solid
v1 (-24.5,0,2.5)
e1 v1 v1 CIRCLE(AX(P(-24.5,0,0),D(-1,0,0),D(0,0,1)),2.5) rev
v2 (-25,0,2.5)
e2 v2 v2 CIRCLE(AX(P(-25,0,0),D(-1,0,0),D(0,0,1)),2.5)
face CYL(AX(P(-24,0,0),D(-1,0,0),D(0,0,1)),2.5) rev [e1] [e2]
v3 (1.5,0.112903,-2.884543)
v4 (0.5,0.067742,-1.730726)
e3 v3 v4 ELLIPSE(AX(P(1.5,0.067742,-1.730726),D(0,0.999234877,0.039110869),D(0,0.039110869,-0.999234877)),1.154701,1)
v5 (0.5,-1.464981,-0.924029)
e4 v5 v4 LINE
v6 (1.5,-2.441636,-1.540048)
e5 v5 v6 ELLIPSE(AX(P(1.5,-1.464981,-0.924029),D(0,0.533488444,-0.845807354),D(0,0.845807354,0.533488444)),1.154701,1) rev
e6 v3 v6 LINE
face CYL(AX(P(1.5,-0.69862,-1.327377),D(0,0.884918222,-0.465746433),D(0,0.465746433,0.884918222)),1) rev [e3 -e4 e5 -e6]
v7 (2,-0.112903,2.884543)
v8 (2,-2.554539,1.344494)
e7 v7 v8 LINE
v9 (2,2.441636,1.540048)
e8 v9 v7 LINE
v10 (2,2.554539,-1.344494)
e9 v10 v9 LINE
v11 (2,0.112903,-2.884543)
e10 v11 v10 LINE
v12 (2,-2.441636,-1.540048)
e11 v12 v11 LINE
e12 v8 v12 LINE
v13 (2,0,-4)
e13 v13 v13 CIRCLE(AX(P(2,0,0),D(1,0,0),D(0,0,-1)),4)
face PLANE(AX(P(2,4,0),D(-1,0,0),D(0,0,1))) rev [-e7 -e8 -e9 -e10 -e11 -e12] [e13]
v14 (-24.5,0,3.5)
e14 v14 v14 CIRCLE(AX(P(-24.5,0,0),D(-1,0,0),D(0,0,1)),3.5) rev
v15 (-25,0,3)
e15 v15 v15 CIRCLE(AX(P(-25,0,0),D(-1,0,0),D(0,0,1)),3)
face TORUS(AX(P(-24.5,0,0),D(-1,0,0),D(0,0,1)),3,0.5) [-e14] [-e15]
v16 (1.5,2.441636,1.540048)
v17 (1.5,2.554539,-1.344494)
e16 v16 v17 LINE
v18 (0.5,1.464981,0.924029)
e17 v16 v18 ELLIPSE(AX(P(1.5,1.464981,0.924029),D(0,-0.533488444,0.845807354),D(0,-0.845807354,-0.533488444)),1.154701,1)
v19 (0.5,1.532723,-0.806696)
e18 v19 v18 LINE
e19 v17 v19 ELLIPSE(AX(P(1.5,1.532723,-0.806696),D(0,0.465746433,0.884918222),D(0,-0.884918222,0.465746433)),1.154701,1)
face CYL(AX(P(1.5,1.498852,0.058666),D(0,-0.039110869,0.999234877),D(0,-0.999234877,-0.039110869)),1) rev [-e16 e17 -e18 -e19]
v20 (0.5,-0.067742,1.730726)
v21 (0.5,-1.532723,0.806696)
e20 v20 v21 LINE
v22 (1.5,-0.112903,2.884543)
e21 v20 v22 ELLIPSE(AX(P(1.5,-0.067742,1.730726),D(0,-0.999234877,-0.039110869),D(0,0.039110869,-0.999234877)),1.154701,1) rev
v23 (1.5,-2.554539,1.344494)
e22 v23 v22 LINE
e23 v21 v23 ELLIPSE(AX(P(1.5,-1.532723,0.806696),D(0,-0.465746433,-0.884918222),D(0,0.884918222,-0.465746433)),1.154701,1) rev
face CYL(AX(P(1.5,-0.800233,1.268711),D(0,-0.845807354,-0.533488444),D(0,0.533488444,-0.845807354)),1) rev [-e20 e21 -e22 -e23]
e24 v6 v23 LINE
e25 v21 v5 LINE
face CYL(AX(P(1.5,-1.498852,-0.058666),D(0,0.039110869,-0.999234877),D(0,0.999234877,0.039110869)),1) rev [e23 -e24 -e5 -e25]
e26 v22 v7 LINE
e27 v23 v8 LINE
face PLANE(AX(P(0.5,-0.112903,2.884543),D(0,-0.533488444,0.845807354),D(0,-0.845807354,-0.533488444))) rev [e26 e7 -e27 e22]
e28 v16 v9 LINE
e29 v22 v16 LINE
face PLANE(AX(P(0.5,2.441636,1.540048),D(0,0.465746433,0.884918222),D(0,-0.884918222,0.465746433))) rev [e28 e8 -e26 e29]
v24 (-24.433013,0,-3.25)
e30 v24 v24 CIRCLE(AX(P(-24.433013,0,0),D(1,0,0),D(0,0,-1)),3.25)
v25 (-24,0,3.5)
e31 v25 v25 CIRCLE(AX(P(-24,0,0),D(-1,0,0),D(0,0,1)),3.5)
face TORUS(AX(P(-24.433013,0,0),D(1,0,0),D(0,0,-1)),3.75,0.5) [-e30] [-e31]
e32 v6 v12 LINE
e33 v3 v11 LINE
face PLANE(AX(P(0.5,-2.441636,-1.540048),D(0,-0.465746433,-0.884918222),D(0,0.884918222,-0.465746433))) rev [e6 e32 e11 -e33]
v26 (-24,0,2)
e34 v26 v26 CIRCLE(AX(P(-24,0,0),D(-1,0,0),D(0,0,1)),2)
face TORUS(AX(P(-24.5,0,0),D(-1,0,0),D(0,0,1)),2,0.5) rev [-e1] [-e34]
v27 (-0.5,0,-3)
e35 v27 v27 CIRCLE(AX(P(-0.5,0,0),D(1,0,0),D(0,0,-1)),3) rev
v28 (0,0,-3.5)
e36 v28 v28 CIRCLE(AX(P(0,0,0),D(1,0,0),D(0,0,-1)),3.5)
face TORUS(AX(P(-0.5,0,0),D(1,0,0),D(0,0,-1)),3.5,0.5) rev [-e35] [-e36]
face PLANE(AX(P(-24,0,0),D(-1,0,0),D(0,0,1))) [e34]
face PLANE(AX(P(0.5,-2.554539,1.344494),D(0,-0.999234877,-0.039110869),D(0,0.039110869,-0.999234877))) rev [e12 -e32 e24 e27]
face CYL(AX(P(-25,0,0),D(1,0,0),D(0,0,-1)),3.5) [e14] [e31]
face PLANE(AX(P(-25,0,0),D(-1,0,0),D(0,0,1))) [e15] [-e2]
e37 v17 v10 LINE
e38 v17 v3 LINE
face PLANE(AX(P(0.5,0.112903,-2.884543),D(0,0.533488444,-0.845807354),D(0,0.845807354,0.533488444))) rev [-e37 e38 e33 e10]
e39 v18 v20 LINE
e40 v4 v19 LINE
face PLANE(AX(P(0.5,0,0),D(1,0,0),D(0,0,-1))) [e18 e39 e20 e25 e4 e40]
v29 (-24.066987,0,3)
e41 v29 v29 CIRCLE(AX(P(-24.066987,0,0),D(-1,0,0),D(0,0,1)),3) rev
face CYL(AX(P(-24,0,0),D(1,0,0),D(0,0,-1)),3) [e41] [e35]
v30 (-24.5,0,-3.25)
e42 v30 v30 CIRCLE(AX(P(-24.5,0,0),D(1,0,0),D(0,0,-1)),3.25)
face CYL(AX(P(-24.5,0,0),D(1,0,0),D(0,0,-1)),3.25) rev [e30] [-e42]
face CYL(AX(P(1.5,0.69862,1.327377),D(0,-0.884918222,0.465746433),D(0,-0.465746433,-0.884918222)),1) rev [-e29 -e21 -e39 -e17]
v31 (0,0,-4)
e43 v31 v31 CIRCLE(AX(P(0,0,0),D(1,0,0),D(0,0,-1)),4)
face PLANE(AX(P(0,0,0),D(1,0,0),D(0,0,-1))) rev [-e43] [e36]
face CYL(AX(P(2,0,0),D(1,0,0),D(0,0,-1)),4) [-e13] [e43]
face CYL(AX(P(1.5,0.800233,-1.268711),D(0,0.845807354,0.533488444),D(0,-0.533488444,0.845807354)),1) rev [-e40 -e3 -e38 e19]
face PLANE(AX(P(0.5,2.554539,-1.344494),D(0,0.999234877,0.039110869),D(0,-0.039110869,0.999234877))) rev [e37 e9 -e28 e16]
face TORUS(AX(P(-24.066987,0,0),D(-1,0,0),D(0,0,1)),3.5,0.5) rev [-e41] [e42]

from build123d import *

# Parameters (mm, degrees)
ESBO_O4_R                = 3
RESSALTO_EXTRUS_O1_DEPTH = 24
CORTE_EXTRUS_O1_DEPTH    = 1.5
ESBO_O6_R                = 3.5
RESSALTO_EXTRUS_O2_DEPTH = 1
ESBO_O7_R                = 2.5
CORTE_EXTRUS_O2_DEPTH    = 1
ESBO_O8_R                = 3.25
ESBO_O8_R_2              = 3.0000000000000004
CORTE_EXTRUS_O3_DEPTH    = 0.5
FILETE2_R                = 0.5
FILETE3_R                = 1


with BuildPart() as part:
    # Esboço1 → Revolução3 (revolve)
    with BuildSketch(Plane.XY, mode=Mode.PRIVATE) as revolu_o3_sk:
        Polygon((0, 0), (4.3e-16, 4), (2.0000000000000004, 4), (2, 0), align=None)
    revolve(revolu_o3_sk.sketch.rotate(Axis((2, 0, 0), (-1, 0, 0)), 90), axis=Axis((2, 0, 0), (-1, 0, 0)))

    # Esboço4 → Ressalto-extrusão1 (add)
    with BuildSketch(Plane.ZY):
        with Locations(Location((0, 0, 0), (0, 0, 180))):
            Circle(ESBO_O4_R)
    extrude(amount=RESSALTO_EXTRUS_O1_DEPTH)

    # Esboço5 → Corte-extrusão1 (cut)
    with BuildSketch(Plane(origin=(2, 0, 0), x_dir=(0, 0, -1), z_dir=(1, 0, 0))):
        Polygon((1.3444941418500793, 2.554538869515231), (-1.5400484850299316, 2.441635516839142), (-2.88454262688001, -0.11290335267608817), (-1.3444941418500784, -2.5545388695152305), (1.540048485029931, -2.4416355168391424), (2.8845426268800107, 0.11290335267608934), align=None)
    extrude(amount=-CORTE_EXTRUS_O1_DEPTH, mode=Mode.SUBTRACT)

    # Esboço6 → Ressalto-extrusão2 (add)
    with BuildSketch(Plane.ZY.offset(24)):
        Circle(ESBO_O6_R)
    extrude(amount=RESSALTO_EXTRUS_O2_DEPTH)

    # Esboço7 → Corte-extrusão2 (cut)
    with BuildSketch(Plane.ZY.offset(25)):
        Circle(ESBO_O7_R)
    extrude(amount=-CORTE_EXTRUS_O2_DEPTH, mode=Mode.SUBTRACT)

    # Esboço8 → Corte-extrusão3 (cut)
    with BuildSketch(Plane(origin=(-24, 0, 0), x_dir=(0, 0, -1), z_dir=(1, 0, 0))):
        Circle(ESBO_O8_R)
        Circle(ESBO_O8_R_2, mode=Mode.SUBTRACT)
    extrude(amount=-CORTE_EXTRUS_O3_DEPTH, mode=Mode.SUBTRACT)

    # Filete2
    # the kernel refuses this fillet: 0.5 mm, written as the material it adds along each edge
    with BuildSketch(Plane(origin=(-24, 0, 0), x_dir=(0, 0, 1), z_dir=(0, -1, 0))) as filete2_piece_1:
        with BuildLine():
            CenterArc((2.5 - FILETE2_R, FILETE2_R), FILETE2_R, 270, 90)
            Line((2.5 - FILETE2_R, 0), (2.5 - FILETE2_R, -FILETE2_R * 0.02))
            Line((2.5 - FILETE2_R, -FILETE2_R * 0.02), (2.5 + FILETE2_R * 0.02, -FILETE2_R * 0.02))
            Line((2.5 + FILETE2_R * 0.02, -FILETE2_R * 0.02), (2.5 + FILETE2_R * 0.02, FILETE2_R))
            Line((2.5 + FILETE2_R * 0.02, FILETE2_R), (2.5, FILETE2_R))
        make_face()
    revolve(axis=Axis((-24, 0, 0), (-1, 0, 0)))
    with BuildSketch(Plane(origin=(-24.5, 0, 0), x_dir=(0, 0, -1), z_dir=(0, -1, 0))) as filete2_piece_2:
        with BuildLine():
            CenterArc((3.5000000000000004, 0.4330127018922383), FILETE2_R, 180, 60.00000000000102)
            Line((3.0000000000000004, 0.4330127018922383), (2.9900000000000007, 0.4330127018922383))
            Line((2.9900000000000007, 0.4330127018922383), (2.9900000000000007, 0))
            Line((2.9900000000000007, 0), (3.0000000000000004, -0.01000000000000156))
            ThreePointArc((3.0000000000000004, -0.01000000000000156), (3.1250000000000044, -0.01000000000000156), (3.2450000000000085, -0.00866025403783155))
            Line((3.2450000000000085, -0.00866025403783155), (3.2500000000000084, 1.421e-14))
        make_face()
    revolve(axis=Axis((-24.5, 0, 0), (1, 0, 0)))
    with BuildSketch(Plane(origin=(0, 0, 0), x_dir=(0, 1.2e-16, -1), z_dir=(0, 1, 1.2e-16))) as filete2_piece_3:
        with BuildLine():
            CenterArc((3 + FILETE2_R, FILETE2_R), FILETE2_R, 180, 90)
            Line((3 + FILETE2_R, -6e-17), (3 + FILETE2_R, -FILETE2_R * 0.02))
            Line((3 + FILETE2_R, -FILETE2_R * 0.02), (3 - FILETE2_R * 0.02, -FILETE2_R * 0.02))
            Line((3 - FILETE2_R * 0.02, -FILETE2_R * 0.02), (3 - FILETE2_R * 0.02, FILETE2_R))
            Line((3 - FILETE2_R * 0.02, FILETE2_R), (3, FILETE2_R))
        make_face()
    revolve(axis=Axis((0, 0, 0), (-1, 0, 0)))
    # the kernel refuses this fillet: 0.5 mm, written as the material it takes off along each edge
    with BuildSketch(Plane(origin=(-25, 0, 0), x_dir=(0, 0, 1), z_dir=(0, -1, 0))) as filete2_2_piece_1:
        with BuildLine():
            CenterArc((3.5 - FILETE2_R, -FILETE2_R), FILETE2_R, 0, 90)
            Line((3.5 - FILETE2_R, 0), (3.5 - FILETE2_R, FILETE2_R * 0.02))
            Line((3.5 - FILETE2_R, FILETE2_R * 0.02), (3.5 + FILETE2_R * 0.02, FILETE2_R * 0.02))
            Line((3.5 + FILETE2_R * 0.02, FILETE2_R * 0.02), (3.5 + FILETE2_R * 0.02, -FILETE2_R))
            Line((3.5 + FILETE2_R * 0.02, -FILETE2_R), (3.5, -FILETE2_R))
        make_face()
    revolve(axis=Axis((-25, 0, 0), (-1, 0, 0)), mode=Mode.SUBTRACT)
    with BuildSketch(Plane(origin=(-24, 0, 0), x_dir=(0, 0, -1), z_dir=(0, -1, 0))) as filete2_2_piece_2:
        with BuildLine():
            CenterArc((3.75, -0.4330127018922454), FILETE2_R, 119.99999999999864, 60.000000000001364)
            Line((3.25, -0.4330127018922454), (3.24, -0.4330127018922454))
            Line((3.24, -0.4330127018922454), (3.24, 0))
            Line((3.24, 0), (3.25, 0.01000000000000156))
            ThreePointArc((3.25, 0.01000000000000156), (3.3750000000000053, 0.01000000000000156), (3.495000000000011, 0.00866025403782444))
            Line((3.495000000000011, 0.00866025403782444), (3.500000000000011, -2.132e-14))
        make_face()
    revolve(axis=Axis((-24, 0, 0), (1, 0, 0)), mode=Mode.SUBTRACT)

    # Filete3
    filete3_edges = [part.edges().sort_by_distance(p)[0] for p in [
        (0.5, 1.3337211110956604, -2.114518384365045),
        (0.5, -1.1643660820815265, -2.212295555954971),
        (0.5, -2.498087193177186, -0.09777717158992649),
        (0.5, -1.3337211110956593, 2.114518384365044),
        (0.5, 1.164366082081527, 2.212295555954971),
        (0.5, 2.498087193177186, 0.09777717158992627),
    ]]
    fillet(filete3_edges, radius=FILETE3_R)


solid = part.part
